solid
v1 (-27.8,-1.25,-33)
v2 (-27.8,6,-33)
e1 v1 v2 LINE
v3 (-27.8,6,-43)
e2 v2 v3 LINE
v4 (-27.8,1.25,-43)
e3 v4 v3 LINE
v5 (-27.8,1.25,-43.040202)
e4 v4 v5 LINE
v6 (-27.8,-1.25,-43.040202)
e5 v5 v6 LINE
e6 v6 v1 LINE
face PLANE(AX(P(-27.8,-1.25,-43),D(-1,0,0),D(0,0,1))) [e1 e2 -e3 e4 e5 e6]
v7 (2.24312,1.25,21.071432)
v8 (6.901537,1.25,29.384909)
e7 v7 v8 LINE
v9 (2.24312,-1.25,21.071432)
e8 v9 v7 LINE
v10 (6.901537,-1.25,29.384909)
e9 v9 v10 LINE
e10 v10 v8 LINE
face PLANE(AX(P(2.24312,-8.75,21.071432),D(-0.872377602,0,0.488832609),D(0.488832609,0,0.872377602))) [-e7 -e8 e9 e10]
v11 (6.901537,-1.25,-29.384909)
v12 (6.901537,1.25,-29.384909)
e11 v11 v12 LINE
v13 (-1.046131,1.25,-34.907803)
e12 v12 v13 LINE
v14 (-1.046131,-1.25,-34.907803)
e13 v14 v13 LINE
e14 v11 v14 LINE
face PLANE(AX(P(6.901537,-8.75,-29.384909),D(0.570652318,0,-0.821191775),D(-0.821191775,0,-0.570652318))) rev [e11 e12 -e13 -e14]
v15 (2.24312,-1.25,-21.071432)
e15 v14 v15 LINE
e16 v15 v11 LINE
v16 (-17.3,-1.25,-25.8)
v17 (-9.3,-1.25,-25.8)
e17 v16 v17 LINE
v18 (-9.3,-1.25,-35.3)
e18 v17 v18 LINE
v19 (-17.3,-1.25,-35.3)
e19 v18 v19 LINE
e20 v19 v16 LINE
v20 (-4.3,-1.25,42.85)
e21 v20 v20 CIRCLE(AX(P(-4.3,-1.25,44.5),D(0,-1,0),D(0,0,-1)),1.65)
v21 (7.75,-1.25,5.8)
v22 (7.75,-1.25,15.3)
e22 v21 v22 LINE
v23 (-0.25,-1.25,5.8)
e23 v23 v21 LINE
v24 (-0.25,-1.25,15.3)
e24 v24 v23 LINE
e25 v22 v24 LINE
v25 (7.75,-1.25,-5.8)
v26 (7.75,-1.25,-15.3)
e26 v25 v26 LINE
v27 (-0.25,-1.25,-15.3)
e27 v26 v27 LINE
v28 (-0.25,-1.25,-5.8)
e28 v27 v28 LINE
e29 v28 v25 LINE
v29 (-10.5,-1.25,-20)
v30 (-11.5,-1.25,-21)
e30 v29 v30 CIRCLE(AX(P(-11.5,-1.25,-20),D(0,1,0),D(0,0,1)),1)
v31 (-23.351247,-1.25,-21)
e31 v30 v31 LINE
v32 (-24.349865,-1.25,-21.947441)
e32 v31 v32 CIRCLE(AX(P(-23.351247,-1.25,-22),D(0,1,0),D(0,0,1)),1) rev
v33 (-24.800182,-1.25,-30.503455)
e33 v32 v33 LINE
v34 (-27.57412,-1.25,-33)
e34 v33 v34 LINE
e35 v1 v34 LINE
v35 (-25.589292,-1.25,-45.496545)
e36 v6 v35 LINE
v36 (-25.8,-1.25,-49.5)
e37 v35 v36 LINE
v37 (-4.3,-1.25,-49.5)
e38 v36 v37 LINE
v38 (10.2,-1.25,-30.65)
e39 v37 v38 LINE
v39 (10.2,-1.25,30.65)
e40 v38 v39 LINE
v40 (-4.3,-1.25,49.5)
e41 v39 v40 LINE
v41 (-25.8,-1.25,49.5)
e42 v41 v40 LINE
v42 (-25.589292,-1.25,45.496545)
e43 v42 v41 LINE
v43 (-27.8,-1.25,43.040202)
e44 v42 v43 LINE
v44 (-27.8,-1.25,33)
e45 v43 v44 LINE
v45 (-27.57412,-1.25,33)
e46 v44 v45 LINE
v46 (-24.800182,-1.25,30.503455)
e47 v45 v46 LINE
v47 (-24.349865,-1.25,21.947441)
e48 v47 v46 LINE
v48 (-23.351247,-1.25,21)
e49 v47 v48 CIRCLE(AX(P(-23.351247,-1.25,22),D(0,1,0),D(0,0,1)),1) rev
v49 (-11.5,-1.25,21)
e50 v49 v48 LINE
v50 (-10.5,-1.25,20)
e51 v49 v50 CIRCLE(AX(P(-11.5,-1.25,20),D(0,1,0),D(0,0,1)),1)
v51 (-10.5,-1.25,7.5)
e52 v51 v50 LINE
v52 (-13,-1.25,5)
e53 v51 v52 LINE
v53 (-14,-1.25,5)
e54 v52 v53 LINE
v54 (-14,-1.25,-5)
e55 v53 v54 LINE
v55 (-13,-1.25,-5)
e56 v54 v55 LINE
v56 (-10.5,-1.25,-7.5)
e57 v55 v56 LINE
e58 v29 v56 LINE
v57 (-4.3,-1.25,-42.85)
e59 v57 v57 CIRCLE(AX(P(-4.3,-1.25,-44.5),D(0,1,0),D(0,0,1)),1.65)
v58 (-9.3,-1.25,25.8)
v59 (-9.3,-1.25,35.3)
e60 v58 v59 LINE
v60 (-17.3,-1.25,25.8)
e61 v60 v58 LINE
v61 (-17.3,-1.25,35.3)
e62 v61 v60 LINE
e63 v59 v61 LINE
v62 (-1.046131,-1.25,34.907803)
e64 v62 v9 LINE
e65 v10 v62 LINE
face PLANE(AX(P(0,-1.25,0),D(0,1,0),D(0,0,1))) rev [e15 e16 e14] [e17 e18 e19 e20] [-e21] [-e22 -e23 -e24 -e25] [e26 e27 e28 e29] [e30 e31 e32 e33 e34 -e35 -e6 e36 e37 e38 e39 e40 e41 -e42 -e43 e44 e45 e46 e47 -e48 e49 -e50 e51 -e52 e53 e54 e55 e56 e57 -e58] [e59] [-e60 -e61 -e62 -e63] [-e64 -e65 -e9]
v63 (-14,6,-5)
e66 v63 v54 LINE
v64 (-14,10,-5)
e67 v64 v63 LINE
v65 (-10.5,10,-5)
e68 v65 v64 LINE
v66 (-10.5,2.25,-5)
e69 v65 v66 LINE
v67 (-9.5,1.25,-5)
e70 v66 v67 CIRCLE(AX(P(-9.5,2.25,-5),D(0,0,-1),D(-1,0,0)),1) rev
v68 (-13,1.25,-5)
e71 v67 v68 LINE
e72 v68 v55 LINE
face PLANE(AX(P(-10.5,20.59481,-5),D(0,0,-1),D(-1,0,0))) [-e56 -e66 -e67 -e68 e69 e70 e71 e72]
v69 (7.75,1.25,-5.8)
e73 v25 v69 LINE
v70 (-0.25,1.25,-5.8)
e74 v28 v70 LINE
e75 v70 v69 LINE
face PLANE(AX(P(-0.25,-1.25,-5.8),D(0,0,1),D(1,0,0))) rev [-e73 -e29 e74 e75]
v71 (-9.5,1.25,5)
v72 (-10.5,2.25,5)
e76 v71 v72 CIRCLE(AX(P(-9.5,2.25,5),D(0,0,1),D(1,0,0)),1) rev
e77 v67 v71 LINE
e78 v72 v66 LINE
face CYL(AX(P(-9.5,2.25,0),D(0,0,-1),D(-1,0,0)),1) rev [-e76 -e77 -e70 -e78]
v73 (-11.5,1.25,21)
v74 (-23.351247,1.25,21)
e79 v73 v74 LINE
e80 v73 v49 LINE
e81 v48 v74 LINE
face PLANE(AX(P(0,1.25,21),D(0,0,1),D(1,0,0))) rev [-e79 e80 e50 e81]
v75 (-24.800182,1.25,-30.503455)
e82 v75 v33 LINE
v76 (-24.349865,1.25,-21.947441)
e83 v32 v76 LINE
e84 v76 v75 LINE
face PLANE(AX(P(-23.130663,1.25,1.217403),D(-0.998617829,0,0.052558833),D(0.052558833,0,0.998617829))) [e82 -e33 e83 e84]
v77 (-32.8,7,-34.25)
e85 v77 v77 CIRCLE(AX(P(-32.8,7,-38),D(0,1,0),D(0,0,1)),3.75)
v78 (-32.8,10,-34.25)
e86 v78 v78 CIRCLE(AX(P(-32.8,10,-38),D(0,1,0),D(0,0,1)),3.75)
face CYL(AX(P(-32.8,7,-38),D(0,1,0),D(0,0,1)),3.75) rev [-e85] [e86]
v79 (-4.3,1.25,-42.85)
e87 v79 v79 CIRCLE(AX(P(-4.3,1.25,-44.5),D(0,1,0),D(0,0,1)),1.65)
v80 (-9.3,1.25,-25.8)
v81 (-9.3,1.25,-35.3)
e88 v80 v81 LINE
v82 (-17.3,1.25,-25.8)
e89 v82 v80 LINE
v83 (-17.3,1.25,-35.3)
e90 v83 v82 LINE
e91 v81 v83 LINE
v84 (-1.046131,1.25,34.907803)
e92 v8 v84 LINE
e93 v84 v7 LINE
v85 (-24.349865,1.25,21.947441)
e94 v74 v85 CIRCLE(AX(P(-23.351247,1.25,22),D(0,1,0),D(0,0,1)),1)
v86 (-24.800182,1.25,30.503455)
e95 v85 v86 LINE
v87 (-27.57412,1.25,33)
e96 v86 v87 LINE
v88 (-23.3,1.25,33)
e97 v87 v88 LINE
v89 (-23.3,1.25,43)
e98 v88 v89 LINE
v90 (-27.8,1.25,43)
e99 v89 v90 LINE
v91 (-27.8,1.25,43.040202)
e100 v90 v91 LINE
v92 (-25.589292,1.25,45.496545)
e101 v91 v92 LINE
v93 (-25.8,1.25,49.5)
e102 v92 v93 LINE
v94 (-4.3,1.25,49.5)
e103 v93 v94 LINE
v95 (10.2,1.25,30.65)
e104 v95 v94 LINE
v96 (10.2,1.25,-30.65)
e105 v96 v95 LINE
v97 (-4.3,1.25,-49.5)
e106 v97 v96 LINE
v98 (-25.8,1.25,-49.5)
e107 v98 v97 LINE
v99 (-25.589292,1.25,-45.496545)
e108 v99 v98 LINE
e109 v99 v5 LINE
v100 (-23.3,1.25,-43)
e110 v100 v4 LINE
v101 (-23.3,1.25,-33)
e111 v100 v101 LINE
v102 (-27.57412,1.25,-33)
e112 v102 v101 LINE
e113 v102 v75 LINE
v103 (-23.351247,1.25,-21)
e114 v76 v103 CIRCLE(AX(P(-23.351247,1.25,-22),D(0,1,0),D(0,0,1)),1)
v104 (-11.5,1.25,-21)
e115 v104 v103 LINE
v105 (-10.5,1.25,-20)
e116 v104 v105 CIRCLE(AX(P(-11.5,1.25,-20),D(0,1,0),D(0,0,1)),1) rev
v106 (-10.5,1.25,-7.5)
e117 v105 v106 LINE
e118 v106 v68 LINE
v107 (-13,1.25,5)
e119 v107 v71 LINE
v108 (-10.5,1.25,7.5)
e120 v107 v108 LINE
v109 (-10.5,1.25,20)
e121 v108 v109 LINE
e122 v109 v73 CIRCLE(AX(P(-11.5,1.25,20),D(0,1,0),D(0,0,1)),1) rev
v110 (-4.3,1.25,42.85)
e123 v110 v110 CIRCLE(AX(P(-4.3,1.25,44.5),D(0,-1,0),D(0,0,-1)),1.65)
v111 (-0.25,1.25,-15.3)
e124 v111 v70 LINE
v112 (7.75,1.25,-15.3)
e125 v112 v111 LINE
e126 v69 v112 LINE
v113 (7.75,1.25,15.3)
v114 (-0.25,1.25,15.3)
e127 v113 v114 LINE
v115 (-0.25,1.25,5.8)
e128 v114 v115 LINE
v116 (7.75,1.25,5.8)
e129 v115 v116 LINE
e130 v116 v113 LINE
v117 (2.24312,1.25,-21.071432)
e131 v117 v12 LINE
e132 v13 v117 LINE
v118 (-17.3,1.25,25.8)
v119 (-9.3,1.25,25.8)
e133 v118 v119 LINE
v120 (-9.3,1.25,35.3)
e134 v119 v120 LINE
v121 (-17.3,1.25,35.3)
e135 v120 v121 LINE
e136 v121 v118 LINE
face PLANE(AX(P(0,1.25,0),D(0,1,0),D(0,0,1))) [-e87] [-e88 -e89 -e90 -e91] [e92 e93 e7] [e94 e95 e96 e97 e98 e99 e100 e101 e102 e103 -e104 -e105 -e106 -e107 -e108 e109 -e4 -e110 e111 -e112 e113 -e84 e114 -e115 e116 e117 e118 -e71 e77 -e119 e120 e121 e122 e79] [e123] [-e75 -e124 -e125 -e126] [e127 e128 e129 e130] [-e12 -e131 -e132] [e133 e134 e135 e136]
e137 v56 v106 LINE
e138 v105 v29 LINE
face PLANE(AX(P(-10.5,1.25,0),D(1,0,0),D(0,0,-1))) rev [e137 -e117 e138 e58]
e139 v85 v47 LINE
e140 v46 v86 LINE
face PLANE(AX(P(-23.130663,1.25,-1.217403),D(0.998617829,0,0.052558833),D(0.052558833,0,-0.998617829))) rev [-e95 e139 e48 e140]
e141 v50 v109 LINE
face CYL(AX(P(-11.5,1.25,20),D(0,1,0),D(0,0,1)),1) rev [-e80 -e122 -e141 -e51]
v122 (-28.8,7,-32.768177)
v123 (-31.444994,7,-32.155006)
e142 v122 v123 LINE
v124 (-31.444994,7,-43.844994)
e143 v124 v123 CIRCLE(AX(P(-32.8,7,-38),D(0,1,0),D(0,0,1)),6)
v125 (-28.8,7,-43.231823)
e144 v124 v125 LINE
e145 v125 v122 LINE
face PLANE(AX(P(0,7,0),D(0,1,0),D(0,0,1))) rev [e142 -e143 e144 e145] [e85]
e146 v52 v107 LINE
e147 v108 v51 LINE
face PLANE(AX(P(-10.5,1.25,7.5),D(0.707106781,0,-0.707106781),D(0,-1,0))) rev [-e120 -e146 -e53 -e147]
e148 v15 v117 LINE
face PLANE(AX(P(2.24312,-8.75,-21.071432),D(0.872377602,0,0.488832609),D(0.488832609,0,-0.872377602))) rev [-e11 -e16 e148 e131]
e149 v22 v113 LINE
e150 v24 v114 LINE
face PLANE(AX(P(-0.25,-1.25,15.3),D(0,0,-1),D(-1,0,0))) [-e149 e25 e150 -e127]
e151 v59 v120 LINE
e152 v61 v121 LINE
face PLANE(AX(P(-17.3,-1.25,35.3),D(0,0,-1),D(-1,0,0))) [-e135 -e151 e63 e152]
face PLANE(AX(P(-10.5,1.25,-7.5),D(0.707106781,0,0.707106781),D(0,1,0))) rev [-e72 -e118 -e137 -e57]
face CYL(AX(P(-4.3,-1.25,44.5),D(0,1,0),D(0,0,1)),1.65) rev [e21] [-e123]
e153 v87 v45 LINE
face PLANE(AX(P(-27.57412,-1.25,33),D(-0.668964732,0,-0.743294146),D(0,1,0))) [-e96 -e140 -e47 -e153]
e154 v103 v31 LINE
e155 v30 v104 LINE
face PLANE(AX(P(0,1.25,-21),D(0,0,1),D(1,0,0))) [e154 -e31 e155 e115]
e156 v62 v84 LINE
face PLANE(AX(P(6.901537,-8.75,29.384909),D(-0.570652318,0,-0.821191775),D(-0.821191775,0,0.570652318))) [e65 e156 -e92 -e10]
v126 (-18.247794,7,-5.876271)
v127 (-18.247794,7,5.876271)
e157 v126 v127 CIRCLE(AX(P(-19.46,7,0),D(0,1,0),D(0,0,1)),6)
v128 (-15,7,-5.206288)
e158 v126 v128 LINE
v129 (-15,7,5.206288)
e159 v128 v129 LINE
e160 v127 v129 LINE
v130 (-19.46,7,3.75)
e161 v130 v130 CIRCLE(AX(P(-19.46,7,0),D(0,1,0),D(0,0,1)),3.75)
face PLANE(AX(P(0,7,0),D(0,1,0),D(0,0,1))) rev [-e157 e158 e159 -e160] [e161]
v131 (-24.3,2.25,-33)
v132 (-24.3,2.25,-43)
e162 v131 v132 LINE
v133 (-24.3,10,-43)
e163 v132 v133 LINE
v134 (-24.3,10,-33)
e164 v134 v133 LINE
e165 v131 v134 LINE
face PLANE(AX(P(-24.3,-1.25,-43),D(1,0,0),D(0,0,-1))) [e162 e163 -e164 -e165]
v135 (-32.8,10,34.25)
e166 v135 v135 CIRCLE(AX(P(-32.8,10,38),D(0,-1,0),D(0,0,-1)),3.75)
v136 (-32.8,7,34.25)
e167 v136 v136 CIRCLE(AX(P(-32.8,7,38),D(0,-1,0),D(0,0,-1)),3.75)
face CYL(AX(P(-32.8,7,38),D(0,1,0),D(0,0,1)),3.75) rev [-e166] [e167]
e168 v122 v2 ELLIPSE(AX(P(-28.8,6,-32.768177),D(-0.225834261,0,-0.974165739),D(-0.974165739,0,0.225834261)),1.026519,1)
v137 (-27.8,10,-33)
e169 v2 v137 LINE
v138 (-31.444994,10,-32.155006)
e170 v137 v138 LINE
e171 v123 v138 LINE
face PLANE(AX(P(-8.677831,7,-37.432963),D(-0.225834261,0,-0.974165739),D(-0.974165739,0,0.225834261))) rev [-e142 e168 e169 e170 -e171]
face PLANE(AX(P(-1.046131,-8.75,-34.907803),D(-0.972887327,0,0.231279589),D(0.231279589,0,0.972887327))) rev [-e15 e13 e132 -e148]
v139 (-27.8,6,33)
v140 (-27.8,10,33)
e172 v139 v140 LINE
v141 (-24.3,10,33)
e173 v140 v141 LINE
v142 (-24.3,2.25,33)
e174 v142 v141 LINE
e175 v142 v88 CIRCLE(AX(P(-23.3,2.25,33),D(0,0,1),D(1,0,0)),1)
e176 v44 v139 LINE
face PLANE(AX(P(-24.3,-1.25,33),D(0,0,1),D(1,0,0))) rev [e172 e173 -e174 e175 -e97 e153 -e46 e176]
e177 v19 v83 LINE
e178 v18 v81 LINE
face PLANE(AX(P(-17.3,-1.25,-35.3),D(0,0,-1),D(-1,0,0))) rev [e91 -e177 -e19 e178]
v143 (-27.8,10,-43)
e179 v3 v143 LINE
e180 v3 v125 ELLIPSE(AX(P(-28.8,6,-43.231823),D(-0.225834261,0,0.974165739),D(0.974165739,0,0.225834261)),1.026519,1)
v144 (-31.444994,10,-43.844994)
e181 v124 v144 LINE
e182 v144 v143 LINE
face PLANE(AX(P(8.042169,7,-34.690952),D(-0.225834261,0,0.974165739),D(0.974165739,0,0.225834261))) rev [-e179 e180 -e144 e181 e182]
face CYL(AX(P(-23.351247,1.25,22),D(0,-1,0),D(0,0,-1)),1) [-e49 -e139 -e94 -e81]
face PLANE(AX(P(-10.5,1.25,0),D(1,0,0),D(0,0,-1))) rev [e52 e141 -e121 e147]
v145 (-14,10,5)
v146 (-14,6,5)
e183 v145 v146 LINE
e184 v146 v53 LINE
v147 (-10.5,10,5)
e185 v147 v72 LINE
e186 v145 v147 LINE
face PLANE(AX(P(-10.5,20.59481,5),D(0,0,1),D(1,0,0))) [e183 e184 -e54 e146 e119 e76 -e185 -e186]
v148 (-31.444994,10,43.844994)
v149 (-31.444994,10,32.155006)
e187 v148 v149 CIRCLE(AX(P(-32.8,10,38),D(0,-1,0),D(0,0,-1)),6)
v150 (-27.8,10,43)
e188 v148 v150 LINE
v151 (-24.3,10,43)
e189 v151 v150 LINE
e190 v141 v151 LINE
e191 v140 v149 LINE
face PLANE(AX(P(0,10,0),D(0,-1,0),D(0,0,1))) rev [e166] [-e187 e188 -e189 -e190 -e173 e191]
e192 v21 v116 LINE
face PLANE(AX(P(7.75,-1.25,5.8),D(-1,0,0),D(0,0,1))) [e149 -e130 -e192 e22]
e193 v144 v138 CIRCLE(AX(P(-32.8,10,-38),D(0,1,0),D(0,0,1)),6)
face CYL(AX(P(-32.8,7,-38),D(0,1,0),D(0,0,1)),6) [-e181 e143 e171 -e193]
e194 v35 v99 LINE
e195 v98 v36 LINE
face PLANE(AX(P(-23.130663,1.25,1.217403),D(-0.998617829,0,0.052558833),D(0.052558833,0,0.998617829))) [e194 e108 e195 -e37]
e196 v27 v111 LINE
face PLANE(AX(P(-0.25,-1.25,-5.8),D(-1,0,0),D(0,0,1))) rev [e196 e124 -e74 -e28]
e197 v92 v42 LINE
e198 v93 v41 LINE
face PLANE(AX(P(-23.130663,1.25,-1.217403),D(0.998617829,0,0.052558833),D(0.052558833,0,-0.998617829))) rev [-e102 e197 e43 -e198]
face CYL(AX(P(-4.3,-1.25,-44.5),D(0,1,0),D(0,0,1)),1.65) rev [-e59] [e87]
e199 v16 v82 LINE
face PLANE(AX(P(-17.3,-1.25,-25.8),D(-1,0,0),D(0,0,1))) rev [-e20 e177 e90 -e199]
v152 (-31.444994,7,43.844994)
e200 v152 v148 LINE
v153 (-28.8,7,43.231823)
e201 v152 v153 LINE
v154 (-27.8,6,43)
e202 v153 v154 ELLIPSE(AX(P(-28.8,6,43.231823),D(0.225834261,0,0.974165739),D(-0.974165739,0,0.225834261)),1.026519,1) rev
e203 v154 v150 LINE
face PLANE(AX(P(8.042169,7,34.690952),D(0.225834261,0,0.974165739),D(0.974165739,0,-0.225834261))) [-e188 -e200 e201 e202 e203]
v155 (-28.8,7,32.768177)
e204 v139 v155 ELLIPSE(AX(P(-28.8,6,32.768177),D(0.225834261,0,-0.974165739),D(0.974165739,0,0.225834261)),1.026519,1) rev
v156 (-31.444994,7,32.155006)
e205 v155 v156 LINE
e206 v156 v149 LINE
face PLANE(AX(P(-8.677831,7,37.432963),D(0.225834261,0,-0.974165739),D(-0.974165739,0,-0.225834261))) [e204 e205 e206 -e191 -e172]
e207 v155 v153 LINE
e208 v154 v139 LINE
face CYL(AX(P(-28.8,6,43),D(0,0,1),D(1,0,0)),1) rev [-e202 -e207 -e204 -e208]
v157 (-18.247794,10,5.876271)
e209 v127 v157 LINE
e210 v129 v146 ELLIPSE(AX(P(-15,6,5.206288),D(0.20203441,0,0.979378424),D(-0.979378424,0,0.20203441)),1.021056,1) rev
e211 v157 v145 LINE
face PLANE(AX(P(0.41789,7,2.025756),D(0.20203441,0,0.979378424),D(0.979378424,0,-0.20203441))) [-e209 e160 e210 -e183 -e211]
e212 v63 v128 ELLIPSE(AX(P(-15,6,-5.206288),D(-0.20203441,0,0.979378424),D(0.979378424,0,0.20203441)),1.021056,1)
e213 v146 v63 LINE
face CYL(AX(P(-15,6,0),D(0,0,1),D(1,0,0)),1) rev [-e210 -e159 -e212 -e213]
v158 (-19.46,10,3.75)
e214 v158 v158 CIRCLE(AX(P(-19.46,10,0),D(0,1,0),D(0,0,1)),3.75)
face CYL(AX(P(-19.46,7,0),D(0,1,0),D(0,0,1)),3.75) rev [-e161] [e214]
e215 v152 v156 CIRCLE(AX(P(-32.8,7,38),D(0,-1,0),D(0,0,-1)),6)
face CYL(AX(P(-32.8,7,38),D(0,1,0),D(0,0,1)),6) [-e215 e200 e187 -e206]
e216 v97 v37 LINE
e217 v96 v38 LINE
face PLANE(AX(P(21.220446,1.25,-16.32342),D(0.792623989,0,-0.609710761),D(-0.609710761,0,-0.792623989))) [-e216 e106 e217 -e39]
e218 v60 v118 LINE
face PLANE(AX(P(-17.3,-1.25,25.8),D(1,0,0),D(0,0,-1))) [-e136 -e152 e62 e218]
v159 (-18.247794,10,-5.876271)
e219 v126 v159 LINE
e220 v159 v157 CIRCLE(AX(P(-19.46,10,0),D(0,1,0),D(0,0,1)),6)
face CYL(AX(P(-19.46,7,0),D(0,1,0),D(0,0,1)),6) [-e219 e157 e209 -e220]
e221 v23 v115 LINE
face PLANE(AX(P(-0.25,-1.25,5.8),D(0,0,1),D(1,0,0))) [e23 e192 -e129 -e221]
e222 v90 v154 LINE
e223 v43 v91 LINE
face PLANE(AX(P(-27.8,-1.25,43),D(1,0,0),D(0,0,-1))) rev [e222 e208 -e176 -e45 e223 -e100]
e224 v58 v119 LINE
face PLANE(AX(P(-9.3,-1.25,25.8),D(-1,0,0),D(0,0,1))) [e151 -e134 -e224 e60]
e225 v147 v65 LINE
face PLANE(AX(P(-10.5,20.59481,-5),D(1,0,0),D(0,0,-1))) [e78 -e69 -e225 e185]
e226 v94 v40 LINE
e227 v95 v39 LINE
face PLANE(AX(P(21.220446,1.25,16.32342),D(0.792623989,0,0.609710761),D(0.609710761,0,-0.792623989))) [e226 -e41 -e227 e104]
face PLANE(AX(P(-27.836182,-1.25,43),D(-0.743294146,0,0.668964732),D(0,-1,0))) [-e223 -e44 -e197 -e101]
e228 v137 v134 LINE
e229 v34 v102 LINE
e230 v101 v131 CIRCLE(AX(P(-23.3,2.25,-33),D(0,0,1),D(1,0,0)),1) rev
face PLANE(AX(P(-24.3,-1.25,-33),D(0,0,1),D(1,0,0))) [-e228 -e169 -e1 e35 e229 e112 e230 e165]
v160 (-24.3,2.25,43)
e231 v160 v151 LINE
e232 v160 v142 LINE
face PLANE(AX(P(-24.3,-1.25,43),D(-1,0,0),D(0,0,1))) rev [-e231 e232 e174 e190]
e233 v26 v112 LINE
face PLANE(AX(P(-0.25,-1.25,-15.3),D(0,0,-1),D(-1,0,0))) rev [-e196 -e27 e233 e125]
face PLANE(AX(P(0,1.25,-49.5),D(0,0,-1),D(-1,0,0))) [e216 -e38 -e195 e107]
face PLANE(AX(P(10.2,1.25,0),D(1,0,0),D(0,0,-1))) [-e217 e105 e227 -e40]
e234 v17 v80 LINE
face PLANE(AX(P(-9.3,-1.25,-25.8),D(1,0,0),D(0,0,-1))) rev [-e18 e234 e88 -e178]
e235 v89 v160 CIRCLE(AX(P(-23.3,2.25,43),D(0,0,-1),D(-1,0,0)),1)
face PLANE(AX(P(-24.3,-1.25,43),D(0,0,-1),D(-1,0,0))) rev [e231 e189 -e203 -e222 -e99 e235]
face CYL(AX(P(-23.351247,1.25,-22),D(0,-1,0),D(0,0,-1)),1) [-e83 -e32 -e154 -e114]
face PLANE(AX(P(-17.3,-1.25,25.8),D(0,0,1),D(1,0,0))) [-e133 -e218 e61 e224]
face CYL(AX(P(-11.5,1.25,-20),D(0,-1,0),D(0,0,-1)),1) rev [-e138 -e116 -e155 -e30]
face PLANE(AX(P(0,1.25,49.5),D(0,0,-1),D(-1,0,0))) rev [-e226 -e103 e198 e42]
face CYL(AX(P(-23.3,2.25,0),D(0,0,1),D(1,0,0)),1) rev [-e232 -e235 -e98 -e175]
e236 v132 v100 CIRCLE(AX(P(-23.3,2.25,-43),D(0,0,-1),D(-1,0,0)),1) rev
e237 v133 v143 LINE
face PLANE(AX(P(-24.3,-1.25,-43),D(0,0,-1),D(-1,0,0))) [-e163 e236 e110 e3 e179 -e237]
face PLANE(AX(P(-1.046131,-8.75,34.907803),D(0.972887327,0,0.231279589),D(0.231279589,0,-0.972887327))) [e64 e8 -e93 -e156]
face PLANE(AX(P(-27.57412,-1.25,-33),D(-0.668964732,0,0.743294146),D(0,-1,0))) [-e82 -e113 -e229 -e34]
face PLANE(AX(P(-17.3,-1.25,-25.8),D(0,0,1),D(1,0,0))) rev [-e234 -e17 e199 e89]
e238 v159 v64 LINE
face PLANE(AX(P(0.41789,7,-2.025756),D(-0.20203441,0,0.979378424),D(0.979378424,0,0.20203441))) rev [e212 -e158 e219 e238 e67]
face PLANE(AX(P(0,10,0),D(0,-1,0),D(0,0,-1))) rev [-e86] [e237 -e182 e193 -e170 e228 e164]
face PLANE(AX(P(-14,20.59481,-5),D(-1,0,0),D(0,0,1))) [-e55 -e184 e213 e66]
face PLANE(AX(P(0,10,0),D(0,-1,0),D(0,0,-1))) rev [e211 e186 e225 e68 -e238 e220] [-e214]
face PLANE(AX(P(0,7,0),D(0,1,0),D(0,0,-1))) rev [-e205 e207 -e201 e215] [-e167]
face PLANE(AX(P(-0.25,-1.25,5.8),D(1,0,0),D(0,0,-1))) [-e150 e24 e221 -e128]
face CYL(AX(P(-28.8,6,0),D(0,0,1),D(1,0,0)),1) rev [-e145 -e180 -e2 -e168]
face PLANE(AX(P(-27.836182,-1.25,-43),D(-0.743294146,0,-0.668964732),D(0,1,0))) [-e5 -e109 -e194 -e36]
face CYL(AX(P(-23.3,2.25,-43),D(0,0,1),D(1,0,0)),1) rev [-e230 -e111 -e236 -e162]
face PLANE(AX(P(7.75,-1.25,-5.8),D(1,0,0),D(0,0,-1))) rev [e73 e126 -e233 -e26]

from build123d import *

# Parameters (mm, degrees)
RESSALTO_EXTRUS_O1_DEPTH = 1.25
ESBO_O8_R                = 1.65
ESBO_O8_W                = 8
ESBO_O8_H                = 9.5
CORTE_EXTRUS_O6_DEPTH    = 56.876112964
CORTE_EXTRUS_O5_DEPTH    = 10
RESSALTO_EXTRUS_O4_START = -1.25
ESBO_O12_W               = 3.5
ESBO_O12_H               = 10
RESSALTO_EXTRUS_O4_DEPTH = 11.25
ESBO_O13_R               = 3.75
RESSALTO_EXTRUS_O5_DEPTH = 3
RESSALTO_EXTRUS_O6_START = -11.25
ESBO_O14_W               = 3.5
ESBO_O14_H               = 10
RESSALTO_EXTRUS_O6_DEPTH = 11.25
ESBO_O15_R               = 3.75
RESSALTO_EXTRUS_O7_DEPTH = 3
CHANFRO1_SIZE            = 2.5
CHANFRO1_SIZE_2          = 2.378287199
CHANFRO1_SIZE_3          = 2.642541332
FILETE1_R                = 1


with BuildPart() as part:
    # Esboço1 → Ressalto-extrusão1 (new, symmetric)
    with BuildSketch(Plane(origin=(0, 0, 0), x_dir=(1, 0, 0), z_dir=(0, 1, 0))):
        Polygon((-10.5, -21), (-10.5, 21), (-24.3, 21), (-25.8, 49.5), (-4.3, 49.5), (10.2, 30.65), (10.2, -30.65), (-4.3, -49.5), (-25.8, -49.5), (-24.3, -21), align=None)
    extrude(amount=RESSALTO_EXTRUS_O1_DEPTH, both=True)

    # Esboço8 → Corte-extrusão6 (cut, through all)
    with BuildSketch(Plane(origin=(0, 1.25, 0), x_dir=(1, 0, 0), z_dir=(0, 1, 0))):
        with Locations(Location((-4.3, 44.5, 0), (0, 0, 270))):
            Circle(ESBO_O8_R)
        with Locations((-13.3, 30.55)):
            Rectangle(ESBO_O8_W, ESBO_O8_H)
        with Locations((3.75, 10.55)):
            Rectangle(ESBO_O8_W, ESBO_O8_H)
    corte_extrus_o6 = extrude(amount=-CORTE_EXTRUS_O6_DEPTH, mode=Mode.SUBTRACT)

    # Esboço9 → Corte-extrusão5 (cut)
    with BuildSketch(Plane(origin=(0, 1.25, 0), x_dir=(1, 0, 0), z_dir=(0, 1, 0))):
        Polygon((6.901537023, 29.384909169), (-1.046130524, 34.9078029), (2.24312, 21.07143213), align=None)
    corte_extrus_o5 = extrude(amount=-CORTE_EXTRUS_O5_DEPTH, mode=Mode.SUBTRACT)

    # Esboço12 → Ressalto-extrusão4 (add)
    with BuildSketch(Plane(origin=(0, 0, 0), x_dir=(1, 0, 0), z_dir=(0, 1, 0)).offset(RESSALTO_EXTRUS_O4_START)):
        with Locations((-26.05, 38)):
            Rectangle(ESBO_O12_W, ESBO_O12_H)
    ressalto_extrus_o4 = extrude(amount=RESSALTO_EXTRUS_O4_DEPTH)

    # Esboço13 → Ressalto-extrusão5 (add)
    with BuildSketch(Plane(origin=(0, 10, 0), x_dir=(1, 0, 0), z_dir=(0, 1, 0))):
        with BuildLine():
            Line((-31.444994432, 43.844994432), (-27.8, 43))
            Line((-27.8, 43), (-27.8, 33))
            Line((-27.8, 33), (-31.444994432, 32.155005568))
            ThreePointArc((-31.444994432, 32.155005568), (-38.8, 38), (-31.444994432, 43.844994432))
        make_face()
        with Locations(Location((-32.8, 38, 0), (0, 0, 270))):
            Circle(ESBO_O13_R, mode=Mode.SUBTRACT)
    ressalto_extrus_o5 = extrude(amount=-RESSALTO_EXTRUS_O5_DEPTH)

    # Espelhar1: Corte-extrusão6, Corte-extrusão5, Ressalto-extrusão4, Ressalto-extrusão5 across plane
    add(corte_extrus_o6.mirror(Plane.XY), mode=Mode.SUBTRACT)
    add(corte_extrus_o5.mirror(Plane.XY), mode=Mode.SUBTRACT)
    add(ressalto_extrus_o4.mirror(Plane.XY))
    add(ressalto_extrus_o5.mirror(Plane.XY))

    # Esboço14 → Ressalto-extrusão6 (add)
    with BuildSketch(Plane.XZ.offset(1.25).offset(RESSALTO_EXTRUS_O6_START)):
        with Locations((-12.25, 0)):
            Rectangle(ESBO_O14_W, ESBO_O14_H)
    extrude(amount=RESSALTO_EXTRUS_O6_DEPTH)

    # Esboço15 → Ressalto-extrusão7 (add)
    with BuildSketch(Plane(origin=(0, 10, 0), x_dir=(1, 0, 0), z_dir=(0, 1, 0))):
        with BuildLine():
            Line((-18.247793537, 5.876270543), (-14, 5))
            Line((-14, 5), (-14, -5))
            Line((-14, -5), (-18.247793537, -5.876270543))
            ThreePointArc((-18.247793537, -5.876270543), (-25.46, 0), (-18.247793537, 5.876270543))
        make_face()
        with Locations(Location((-19.46, 0, 0), (0, 0, 270))):
            Circle(ESBO_O15_R, mode=Mode.SUBTRACT)
    extrude(amount=-RESSALTO_EXTRUS_O7_DEPTH)

    # Chanfro1
    # the kernel refuses this chamfer: 2.642541332, 2.5, 2.378287199 mm, written as the material it adds along each edge
    with BuildSketch(Plane(origin=(-10.5, 1.25, -5), x_dir=(0.02749587661058631, 0, -0.9996219169112968), z_dir=(0, -1, 0))) as chanfro1_piece_1:
        Polygon((CHANFRO1_SIZE * 0.999621916911, -CHANFRO1_SIZE * 0.0274958766106), (-CHANFRO1_SIZE * 0.0274958766106, -CHANFRO1_SIZE * 0.999621916911), (0, 0), align=None)
    extrude(amount=2.5)
    with BuildSketch(Plane(origin=(-10.5, 1.25, 5), x_dir=(0.02749587661058631, 0, 0.9996219169112968), z_dir=(0, -1, 0))) as chanfro1_piece_2:
        Polygon((CHANFRO1_SIZE * 0.999621916911, CHANFRO1_SIZE * 0.0274958766106), (-CHANFRO1_SIZE * 0.0274958766106, CHANFRO1_SIZE * 0.999621916911), (0, 0), align=None)
    extrude(amount=2.5)
    with BuildSketch(Plane(origin=(-25.457894737, 1.25, 43), x_dir=(-0.9995382917887814, 0, -0.03038425987192659), z_dir=(0, -1, 0))) as chanfro1_piece_3_section:
        Polygon((CHANFRO1_SIZE_2 * 0.999538291707, -CHANFRO1_SIZE_2 * 0.0303842598694), (CHANFRO1_SIZE * 0.0221923026388, -CHANFRO1_SIZE * 0.999753720525), (0, 0), align=None)
    chanfro1_piece_3 = extrude(amount=2.5, mode=Mode.PRIVATE)
    chanfro1_piece_3 = split(chanfro1_piece_3, bisect_by=Plane(origin=(-27.8, 0, 43.832382162), z_dir=(1, 0, 0)), keep=Keep.TOP, mode=Mode.PRIVATE)
    add(chanfro1_piece_3)
    with BuildSketch(Plane(origin=(-24.931578947, -1.25, 33), x_dir=(0.0815134342344048, 0, -0.9966722430364525), z_dir=(0, 1, 0))) as chanfro1_piece_4:
        Polygon((CHANFRO1_SIZE * 0.999578922884, CHANFRO1_SIZE * 0.0290168386568), (-CHANFRO1_SIZE_3 * 0.0815134342346, CHANFRO1_SIZE_3 * 0.996672243039), (0, 0), align=None)
    extrude(amount=2.5)
    with BuildSketch(Plane(origin=(-25.457894737, 1.25, -43), x_dir=(-0.025081088900339724, 0, -0.9996854200095016), z_dir=(0, -1, 0))) as chanfro1_piece_5_section:
        Polygon((CHANFRO1_SIZE * 0.999621916911, -CHANFRO1_SIZE * 0.0274958766106), (CHANFRO1_SIZE_2 * 0.0250810888983, -CHANFRO1_SIZE_2 * 0.999685419928), (0, 0), align=None)
    chanfro1_piece_5 = extrude(amount=2.5, mode=Mode.PRIVATE)
    chanfro1_piece_5 = split(chanfro1_piece_5, bisect_by=Plane(origin=(-27.8, 0, -43.832382162), z_dir=(1, 0, 0)), keep=Keep.TOP, mode=Mode.PRIVATE)
    add(chanfro1_piece_5)
    with BuildSketch(Plane(origin=(-24.931578947, -1.25, -33), x_dir=(-0.9996625353173835, 0, -0.0259772108360549), z_dir=(0, 1, 0))) as chanfro1_piece_6:
        Polygon((CHANFRO1_SIZE_3 * 0.99966253532, CHANFRO1_SIZE_3 * 0.0259772108361), (-CHANFRO1_SIZE * 0.07848240227, CHANFRO1_SIZE * 0.996915499194), (0, 0), align=None)
    extrude(amount=2.5)

    # Filete1
    filete1_edges = [part.edges().sort_by_distance(p)[0] for p in [
        (-27.8, 7, -38),
        (-14, 7, 0),
        (-27.8, 7, 38),
        (-24.3, 1.25, -38),
        (-10.5, 1.25, 0),
        (-24.3, 1.25, 38),
        (-24.3, 0, 21),
        (-10.5, 0, 21),
        (-10.5, 0, -21),
        (-24.3, 0, -21),
    ]]
    fillet(filete1_edges, radius=FILETE1_R)


solid = part.part
